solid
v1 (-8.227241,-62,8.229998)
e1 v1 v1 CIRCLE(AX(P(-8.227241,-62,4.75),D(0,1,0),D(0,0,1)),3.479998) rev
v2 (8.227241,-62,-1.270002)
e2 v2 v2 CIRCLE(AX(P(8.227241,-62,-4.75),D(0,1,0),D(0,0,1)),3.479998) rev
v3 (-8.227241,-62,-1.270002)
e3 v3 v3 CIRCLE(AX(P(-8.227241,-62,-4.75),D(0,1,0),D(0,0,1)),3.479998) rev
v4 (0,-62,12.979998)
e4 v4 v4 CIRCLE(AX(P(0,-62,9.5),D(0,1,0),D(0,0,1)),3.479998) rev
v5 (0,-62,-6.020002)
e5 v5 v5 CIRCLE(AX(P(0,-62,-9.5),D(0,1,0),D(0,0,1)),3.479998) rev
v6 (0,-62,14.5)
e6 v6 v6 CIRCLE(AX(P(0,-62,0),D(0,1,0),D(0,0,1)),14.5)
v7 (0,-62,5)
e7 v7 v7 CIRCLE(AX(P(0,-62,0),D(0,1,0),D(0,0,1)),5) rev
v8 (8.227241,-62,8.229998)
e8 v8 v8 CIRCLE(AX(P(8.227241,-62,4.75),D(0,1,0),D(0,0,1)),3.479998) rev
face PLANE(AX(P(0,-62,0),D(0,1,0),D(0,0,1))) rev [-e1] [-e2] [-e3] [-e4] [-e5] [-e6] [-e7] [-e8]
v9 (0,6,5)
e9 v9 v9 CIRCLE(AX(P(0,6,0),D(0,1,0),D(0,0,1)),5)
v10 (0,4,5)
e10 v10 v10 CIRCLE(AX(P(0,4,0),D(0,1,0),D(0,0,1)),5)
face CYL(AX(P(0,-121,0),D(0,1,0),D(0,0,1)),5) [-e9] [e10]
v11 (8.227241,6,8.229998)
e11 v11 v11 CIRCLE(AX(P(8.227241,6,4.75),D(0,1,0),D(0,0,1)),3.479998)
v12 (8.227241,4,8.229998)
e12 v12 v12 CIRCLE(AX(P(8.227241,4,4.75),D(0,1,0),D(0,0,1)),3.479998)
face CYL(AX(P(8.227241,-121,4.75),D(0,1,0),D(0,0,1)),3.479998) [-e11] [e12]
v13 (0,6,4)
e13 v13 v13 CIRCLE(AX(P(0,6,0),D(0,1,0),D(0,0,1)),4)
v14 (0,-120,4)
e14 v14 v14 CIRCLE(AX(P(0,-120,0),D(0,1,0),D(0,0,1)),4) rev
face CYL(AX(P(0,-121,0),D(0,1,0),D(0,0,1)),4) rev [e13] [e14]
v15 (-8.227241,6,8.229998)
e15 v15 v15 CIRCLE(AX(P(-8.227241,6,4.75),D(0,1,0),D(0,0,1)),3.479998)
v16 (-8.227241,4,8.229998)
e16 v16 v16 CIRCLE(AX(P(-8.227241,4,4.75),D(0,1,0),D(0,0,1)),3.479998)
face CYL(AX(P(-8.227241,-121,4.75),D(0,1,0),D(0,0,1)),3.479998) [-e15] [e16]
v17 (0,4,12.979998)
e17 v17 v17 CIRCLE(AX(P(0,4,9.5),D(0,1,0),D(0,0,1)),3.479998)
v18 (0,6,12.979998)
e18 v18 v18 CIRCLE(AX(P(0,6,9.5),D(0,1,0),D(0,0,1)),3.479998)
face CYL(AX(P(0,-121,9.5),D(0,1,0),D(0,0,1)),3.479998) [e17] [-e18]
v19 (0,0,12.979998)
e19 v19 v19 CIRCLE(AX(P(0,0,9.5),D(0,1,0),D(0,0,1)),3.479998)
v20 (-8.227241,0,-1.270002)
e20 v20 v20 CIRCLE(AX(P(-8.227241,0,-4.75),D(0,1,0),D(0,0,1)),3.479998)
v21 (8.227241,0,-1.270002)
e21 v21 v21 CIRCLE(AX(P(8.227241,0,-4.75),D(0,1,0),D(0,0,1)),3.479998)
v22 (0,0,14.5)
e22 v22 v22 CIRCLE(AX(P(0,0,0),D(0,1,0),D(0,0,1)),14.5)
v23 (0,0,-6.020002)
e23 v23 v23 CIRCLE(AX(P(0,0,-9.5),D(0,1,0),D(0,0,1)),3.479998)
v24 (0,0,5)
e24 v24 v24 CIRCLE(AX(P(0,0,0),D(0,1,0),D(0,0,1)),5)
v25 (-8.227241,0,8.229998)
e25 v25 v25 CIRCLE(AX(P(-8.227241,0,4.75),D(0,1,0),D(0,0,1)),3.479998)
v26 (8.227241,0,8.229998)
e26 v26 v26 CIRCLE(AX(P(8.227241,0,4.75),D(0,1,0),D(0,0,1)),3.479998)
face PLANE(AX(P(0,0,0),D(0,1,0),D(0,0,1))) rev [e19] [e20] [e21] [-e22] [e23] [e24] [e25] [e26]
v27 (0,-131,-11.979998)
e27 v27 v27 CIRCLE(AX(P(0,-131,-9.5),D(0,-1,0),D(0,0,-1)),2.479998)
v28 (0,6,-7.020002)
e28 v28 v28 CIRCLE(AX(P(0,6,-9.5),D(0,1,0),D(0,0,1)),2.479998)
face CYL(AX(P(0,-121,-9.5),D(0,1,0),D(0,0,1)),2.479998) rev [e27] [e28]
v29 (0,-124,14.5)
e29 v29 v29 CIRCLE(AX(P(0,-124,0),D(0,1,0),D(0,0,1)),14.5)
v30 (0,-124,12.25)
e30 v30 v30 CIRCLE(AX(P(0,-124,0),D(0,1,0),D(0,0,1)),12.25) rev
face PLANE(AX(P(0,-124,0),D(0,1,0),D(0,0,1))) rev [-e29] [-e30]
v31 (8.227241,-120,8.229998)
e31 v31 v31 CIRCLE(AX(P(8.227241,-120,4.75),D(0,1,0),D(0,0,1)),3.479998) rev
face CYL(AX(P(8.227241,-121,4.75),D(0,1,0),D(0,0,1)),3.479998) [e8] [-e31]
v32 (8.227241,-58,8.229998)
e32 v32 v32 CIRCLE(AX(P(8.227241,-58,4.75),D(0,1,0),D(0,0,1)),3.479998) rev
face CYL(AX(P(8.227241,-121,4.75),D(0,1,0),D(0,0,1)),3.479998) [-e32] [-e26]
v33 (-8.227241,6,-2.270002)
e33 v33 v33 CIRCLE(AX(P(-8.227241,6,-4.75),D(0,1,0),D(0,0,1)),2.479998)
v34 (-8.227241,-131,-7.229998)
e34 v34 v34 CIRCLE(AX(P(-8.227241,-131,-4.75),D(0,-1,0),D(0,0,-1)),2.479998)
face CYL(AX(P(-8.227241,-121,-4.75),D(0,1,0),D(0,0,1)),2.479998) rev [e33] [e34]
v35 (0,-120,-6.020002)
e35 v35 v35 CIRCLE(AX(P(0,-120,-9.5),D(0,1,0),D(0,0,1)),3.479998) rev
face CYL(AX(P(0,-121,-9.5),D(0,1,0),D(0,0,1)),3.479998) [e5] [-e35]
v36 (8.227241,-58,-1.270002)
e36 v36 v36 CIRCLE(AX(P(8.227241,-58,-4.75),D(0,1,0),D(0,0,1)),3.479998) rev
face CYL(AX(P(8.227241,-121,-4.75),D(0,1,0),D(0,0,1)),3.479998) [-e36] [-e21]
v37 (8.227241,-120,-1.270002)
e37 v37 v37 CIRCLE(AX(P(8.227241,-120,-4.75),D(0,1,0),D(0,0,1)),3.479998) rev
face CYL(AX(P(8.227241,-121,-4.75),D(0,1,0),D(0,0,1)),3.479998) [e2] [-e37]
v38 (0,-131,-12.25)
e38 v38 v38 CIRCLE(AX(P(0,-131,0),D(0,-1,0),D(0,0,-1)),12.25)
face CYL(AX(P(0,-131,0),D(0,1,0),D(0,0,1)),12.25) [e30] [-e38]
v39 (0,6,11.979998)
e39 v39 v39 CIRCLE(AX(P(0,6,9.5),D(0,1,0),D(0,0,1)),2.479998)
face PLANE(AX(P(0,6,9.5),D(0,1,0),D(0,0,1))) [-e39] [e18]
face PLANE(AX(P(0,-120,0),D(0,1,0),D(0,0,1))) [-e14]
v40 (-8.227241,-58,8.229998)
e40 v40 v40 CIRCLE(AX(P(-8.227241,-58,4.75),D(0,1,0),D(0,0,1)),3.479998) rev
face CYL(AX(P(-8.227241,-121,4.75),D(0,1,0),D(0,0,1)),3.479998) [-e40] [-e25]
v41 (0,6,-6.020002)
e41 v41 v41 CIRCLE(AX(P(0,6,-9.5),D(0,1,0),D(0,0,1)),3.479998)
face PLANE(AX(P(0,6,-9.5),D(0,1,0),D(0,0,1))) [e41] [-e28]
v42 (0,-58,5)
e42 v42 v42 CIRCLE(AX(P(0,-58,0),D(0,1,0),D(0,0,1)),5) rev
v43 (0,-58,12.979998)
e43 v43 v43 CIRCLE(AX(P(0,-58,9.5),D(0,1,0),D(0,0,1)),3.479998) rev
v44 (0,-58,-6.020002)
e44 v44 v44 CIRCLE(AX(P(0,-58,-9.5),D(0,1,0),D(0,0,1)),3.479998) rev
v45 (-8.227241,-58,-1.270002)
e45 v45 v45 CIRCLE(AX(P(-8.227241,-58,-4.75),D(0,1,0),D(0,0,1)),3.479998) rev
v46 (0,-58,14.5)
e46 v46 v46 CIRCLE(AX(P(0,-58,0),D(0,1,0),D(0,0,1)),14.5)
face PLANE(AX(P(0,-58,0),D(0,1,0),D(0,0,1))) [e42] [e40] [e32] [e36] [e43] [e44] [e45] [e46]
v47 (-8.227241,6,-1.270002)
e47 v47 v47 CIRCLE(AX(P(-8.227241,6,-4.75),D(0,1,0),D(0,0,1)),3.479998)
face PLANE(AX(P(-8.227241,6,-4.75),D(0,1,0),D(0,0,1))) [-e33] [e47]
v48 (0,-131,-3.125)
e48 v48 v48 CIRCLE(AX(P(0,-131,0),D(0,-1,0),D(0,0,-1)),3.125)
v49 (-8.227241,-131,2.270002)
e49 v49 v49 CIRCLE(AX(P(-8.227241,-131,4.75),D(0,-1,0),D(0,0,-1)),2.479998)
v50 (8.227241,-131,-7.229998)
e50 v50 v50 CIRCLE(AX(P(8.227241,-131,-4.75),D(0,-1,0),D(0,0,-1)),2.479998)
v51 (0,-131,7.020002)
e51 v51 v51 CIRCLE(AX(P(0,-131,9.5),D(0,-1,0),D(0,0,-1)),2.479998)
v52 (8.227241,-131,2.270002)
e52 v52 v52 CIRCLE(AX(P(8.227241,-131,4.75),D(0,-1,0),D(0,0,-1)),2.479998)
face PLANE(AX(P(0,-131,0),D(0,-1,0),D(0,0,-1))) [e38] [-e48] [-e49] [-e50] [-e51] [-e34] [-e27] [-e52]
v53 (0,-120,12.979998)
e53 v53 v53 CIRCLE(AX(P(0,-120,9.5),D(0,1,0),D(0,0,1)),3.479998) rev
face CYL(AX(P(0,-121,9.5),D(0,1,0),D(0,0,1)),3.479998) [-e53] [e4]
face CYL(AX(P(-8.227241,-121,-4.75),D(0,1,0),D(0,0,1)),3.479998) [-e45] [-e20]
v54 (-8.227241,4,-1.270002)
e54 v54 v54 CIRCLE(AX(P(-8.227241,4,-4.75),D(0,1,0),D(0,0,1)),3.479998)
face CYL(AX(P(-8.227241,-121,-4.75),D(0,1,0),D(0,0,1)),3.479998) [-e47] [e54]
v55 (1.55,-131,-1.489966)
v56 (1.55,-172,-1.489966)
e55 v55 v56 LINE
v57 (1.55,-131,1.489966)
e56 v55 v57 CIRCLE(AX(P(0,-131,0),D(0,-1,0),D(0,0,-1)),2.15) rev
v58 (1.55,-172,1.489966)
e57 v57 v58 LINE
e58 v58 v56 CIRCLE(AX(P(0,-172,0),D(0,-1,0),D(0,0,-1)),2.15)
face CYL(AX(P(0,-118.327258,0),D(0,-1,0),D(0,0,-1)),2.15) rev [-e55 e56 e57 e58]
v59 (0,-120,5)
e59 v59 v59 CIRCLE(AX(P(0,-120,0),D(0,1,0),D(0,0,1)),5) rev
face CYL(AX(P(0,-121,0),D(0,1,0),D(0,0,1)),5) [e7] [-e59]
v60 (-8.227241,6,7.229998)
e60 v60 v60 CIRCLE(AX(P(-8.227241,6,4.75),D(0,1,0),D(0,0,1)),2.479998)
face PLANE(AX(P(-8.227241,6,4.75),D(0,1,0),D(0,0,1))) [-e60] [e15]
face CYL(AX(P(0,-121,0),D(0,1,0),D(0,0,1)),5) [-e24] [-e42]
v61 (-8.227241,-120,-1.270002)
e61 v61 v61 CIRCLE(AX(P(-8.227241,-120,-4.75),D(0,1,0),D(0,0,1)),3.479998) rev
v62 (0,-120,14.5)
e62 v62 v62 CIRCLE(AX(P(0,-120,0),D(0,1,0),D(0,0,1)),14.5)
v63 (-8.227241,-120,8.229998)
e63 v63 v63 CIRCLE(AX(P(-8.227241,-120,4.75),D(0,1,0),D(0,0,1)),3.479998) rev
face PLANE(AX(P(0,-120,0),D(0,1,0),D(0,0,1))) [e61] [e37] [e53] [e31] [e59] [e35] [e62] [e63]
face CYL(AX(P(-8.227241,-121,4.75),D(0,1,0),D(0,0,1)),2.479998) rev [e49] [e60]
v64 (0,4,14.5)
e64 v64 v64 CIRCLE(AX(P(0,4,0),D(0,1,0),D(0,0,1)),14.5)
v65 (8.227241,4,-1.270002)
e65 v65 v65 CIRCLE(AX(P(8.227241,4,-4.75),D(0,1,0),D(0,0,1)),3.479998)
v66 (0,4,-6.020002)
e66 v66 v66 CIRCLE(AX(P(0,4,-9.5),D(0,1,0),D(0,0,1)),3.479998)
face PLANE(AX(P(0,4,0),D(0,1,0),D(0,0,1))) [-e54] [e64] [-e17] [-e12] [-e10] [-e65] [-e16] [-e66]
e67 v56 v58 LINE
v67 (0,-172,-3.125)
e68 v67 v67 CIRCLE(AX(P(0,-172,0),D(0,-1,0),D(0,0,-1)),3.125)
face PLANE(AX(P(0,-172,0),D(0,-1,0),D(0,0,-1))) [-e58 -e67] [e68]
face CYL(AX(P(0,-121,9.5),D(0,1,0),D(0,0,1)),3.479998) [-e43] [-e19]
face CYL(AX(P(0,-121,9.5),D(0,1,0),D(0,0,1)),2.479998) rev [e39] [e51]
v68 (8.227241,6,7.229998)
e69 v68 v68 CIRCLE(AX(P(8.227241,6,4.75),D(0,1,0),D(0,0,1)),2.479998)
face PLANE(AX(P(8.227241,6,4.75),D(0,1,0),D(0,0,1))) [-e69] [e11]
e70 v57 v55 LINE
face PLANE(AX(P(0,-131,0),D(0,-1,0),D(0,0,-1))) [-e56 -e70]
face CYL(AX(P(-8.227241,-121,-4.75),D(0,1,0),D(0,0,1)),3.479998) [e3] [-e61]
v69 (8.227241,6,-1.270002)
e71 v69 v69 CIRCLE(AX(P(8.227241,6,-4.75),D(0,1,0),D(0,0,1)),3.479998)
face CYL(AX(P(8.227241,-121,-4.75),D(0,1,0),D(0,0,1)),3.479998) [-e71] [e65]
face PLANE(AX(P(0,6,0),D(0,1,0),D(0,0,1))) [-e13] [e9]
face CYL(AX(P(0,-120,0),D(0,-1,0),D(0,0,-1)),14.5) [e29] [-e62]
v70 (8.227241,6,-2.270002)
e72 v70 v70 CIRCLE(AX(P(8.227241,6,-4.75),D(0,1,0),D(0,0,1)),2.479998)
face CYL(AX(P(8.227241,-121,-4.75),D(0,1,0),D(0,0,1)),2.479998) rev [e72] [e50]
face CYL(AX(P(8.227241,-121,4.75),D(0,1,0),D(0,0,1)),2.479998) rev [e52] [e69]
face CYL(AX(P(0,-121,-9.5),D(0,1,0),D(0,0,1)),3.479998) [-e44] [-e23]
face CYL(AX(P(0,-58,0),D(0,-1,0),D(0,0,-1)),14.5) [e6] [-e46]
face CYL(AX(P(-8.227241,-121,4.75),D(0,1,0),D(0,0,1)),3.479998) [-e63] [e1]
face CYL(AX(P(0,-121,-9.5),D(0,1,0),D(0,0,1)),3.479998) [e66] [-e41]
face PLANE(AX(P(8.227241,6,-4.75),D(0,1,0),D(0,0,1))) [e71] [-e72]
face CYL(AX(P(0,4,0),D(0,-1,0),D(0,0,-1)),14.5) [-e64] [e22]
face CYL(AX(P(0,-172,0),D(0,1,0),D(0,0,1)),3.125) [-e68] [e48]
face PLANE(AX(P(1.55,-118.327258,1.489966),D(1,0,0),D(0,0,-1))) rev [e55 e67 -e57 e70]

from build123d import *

# Parameters (mm, degrees)
SKETCH1_R                = 14.5
BOSS_EXTRUDE1_DEPTH      = 4
BOSS_EXTRUDE2_DEPTH      = 2
BOSS_EXTRUDE2_DEPTH_BACK = 125
SKETCH2_R                = 5
SKETCH2_R_2              = 4
SKETCH2_R_3              = 3.479997652
SKETCH2_R_4              = 2.479997652
LPATTERN4_START          = -124
LPATTERN4_OUTLINE_R      = 14.5
LPATTERN4_DEPTH          = 4
LPATTERN4_START_2        = -62
LPATTERN4_2_OUTLINE_R    = 14.5
LPATTERN4_2_OUTLINE_R_2  = 3.479997652
LPATTERN4_2_OUTLINE_R_3  = 5
LPATTERN4_2_OUTLINE_R_4  = 4
LPATTERN4_2_OUTLINE_R_5  = 2.479997652
LPATTERN4_2_DEPTH        = 4
SKETCH8_R                = 2.479997652
CUT_EXTRUDE4_DEPTH       = 128
SKETCH12_R               = 3.125
BOSS_EXTRUDE4_DEPTH      = 48
CUT_EXTRUDE5_DEPTH       = 48
SKETCH14_R               = 4
CUT_EXTRUDE6_DEPTH       = 124
SKETCH16_R               = 12.25
SKETCH16_R_2             = 2.479997652
BOSS_EXTRUDE5_DEPTH      = 7


# Read off the part's stored shape, not the designer's step: LPattern4
with BuildPart() as part:
    # Sketch1 → Boss-Extrude1 (new body)
    with BuildSketch(Plane(origin=(0, 0, 0), x_dir=(1, 0, 0), z_dir=(0, 1, 0))):
        with Locations(Location((0, 0, 0), (0, 0, 270))):
            Circle(SKETCH1_R)
    extrude(amount=BOSS_EXTRUDE1_DEPTH)

    # Sketch2 → Boss-Extrude2 (add, two sides: drawn at the far end of the back side and taken through both)
    # profile 1 of 7: a face of its own
    with BuildSketch(Plane(origin=(0, 4, 0), x_dir=(1, 0, 0), z_dir=(0, 1, 0)).offset(-BOSS_EXTRUDE2_DEPTH_BACK)):
        with Locations(Location((0, 0, 0), (0, 0, 270))):
            Circle(SKETCH2_R)
        with Locations(Location((0, 0, 0), (0, 0, 270))):
            Circle(SKETCH2_R_2, mode=Mode.SUBTRACT)
    # profile 2 of 7: a face of its own
    with BuildSketch(Plane(origin=(0, 4, 0), x_dir=(1, 0, 0), z_dir=(0, 1, 0)).offset(-BOSS_EXTRUDE2_DEPTH_BACK)):
        with Locations(Location((0, 9.5, 0), (0, 0, 270))):
            Circle(SKETCH2_R_3)
        with Locations(Location((0, 9.5, 0), (0, 0, 270))):
            Circle(SKETCH2_R_4, mode=Mode.SUBTRACT)
    # profile 3 of 7: a face of its own
    with BuildSketch(Plane(origin=(0, 4, 0), x_dir=(1, 0, 0), z_dir=(0, 1, 0)).offset(-BOSS_EXTRUDE2_DEPTH_BACK)):
        with Locations(Location((8.227241336, 4.75, 0), (0, 0, 270))):
            Circle(SKETCH2_R_3)
        with Locations(Location((8.227241336, 4.75, 0), (0, 0, 270))):
            Circle(SKETCH2_R_4, mode=Mode.SUBTRACT)
    # profile 4 of 7: a face of its own
    with BuildSketch(Plane(origin=(0, 4, 0), x_dir=(1, 0, 0), z_dir=(0, 1, 0)).offset(-BOSS_EXTRUDE2_DEPTH_BACK)):
        with Locations(Location((8.227241336, -4.75, 0), (0, 0, 270))):
            Circle(SKETCH2_R_3)
        with Locations(Location((8.227241336, -4.75, 0), (0, 0, 270))):
            Circle(SKETCH2_R_4, mode=Mode.SUBTRACT)
    # profile 5 of 7: a face of its own
    with BuildSketch(Plane(origin=(0, 4, 0), x_dir=(1, 0, 0), z_dir=(0, 1, 0)).offset(-BOSS_EXTRUDE2_DEPTH_BACK)):
        with Locations(Location((0, -9.5, 0), (0, 0, 270))):
            Circle(SKETCH2_R_3)
        with Locations(Location((0, -9.5, 0), (0, 0, 270))):
            Circle(SKETCH2_R_4, mode=Mode.SUBTRACT)
    # profile 6 of 7: a face of its own
    with BuildSketch(Plane(origin=(0, 4, 0), x_dir=(1, 0, 0), z_dir=(0, 1, 0)).offset(-BOSS_EXTRUDE2_DEPTH_BACK)):
        with Locations(Location((-8.227241336, -4.75, 0), (0, 0, 270))):
            Circle(SKETCH2_R_3)
        with Locations(Location((-8.227241336, -4.75, 0), (0, 0, 270))):
            Circle(SKETCH2_R_4, mode=Mode.SUBTRACT)
    # profile 7 of 7: a face of its own
    with BuildSketch(Plane(origin=(0, 4, 0), x_dir=(1, 0, 0), z_dir=(0, 1, 0)).offset(-BOSS_EXTRUDE2_DEPTH_BACK)):
        with Locations(Location((-8.227241336, 4.75, 0), (0, 0, 270))):
            Circle(SKETCH2_R_3)
        with Locations(Location((-8.227241336, 4.75, 0), (0, 0, 270))):
            Circle(SKETCH2_R_4, mode=Mode.SUBTRACT)
    extrude(amount=BOSS_EXTRUDE2_DEPTH + BOSS_EXTRUDE2_DEPTH_BACK)

    # LPattern4 outline → LPattern4 (add)
    with BuildSketch(Plane(origin=(0, 0, 0), x_dir=(1, 0, 0), z_dir=(0, 1, 0)).offset(LPATTERN4_START)):
        Circle(LPATTERN4_OUTLINE_R)
    extrude(amount=LPATTERN4_DEPTH)

    # LPattern4 2 outline → LPattern4 2 (add)
    # profile 1 of 8: a face of its own
    with BuildSketch(Plane(origin=(0, 0, 0), x_dir=(1, 0, 0), z_dir=(0, 1, 0)).offset(LPATTERN4_START_2)):
        Circle(LPATTERN4_2_OUTLINE_R)
        with Locations((-8.227241336, -4.75)):
            Circle(LPATTERN4_2_OUTLINE_R_2, mode=Mode.SUBTRACT)
        with Locations((0, -9.5)):
            Circle(LPATTERN4_2_OUTLINE_R_2, mode=Mode.SUBTRACT)
        with Locations((8.227241336, -4.75)):
            Circle(LPATTERN4_2_OUTLINE_R_2, mode=Mode.SUBTRACT)
        with Locations((-8.227241336, 4.75)):
            Circle(LPATTERN4_2_OUTLINE_R_2, mode=Mode.SUBTRACT)
        Circle(LPATTERN4_2_OUTLINE_R_3, mode=Mode.SUBTRACT)
        with Locations((8.227241336, 4.75)):
            Circle(LPATTERN4_2_OUTLINE_R_2, mode=Mode.SUBTRACT)
        with Locations((0, 9.5)):
            Circle(LPATTERN4_2_OUTLINE_R_2, mode=Mode.SUBTRACT)
    # profile 2 of 8: a face of its own
    with BuildSketch(Plane(origin=(0, 0, 0), x_dir=(1, 0, 0), z_dir=(0, 1, 0)).offset(LPATTERN4_START_2)):
        Circle(LPATTERN4_2_OUTLINE_R_4)
    # profile 3 of 8: a face of its own
    with BuildSketch(Plane(origin=(0, 0, 0), x_dir=(1, 0, 0), z_dir=(0, 1, 0)).offset(LPATTERN4_START_2)):
        with Locations((0, 9.5)):
            Circle(LPATTERN4_2_OUTLINE_R_5)
    # profile 4 of 8: a face of its own
    with BuildSketch(Plane(origin=(0, 0, 0), x_dir=(1, 0, 0), z_dir=(0, 1, 0)).offset(LPATTERN4_START_2)):
        with Locations((8.227241336, 4.75)):
            Circle(LPATTERN4_2_OUTLINE_R_5)
    # profile 5 of 8: a face of its own
    with BuildSketch(Plane(origin=(0, 0, 0), x_dir=(1, 0, 0), z_dir=(0, 1, 0)).offset(LPATTERN4_START_2)):
        with Locations((8.227241336, -4.75)):
            Circle(LPATTERN4_2_OUTLINE_R_5)
    # profile 6 of 8: a face of its own
    with BuildSketch(Plane(origin=(0, 0, 0), x_dir=(1, 0, 0), z_dir=(0, 1, 0)).offset(LPATTERN4_START_2)):
        with Locations((0, -9.5)):
            Circle(LPATTERN4_2_OUTLINE_R_5)
    # profile 7 of 8: a face of its own
    with BuildSketch(Plane(origin=(0, 0, 0), x_dir=(1, 0, 0), z_dir=(0, 1, 0)).offset(LPATTERN4_START_2)):
        with Locations((-8.227241336, -4.75)):
            Circle(LPATTERN4_2_OUTLINE_R_5)
    # profile 8 of 8: a face of its own
    with BuildSketch(Plane(origin=(0, 0, 0), x_dir=(1, 0, 0), z_dir=(0, 1, 0)).offset(LPATTERN4_START_2)):
        with Locations((-8.227241336, 4.75)):
            Circle(LPATTERN4_2_OUTLINE_R_5)
    extrude(amount=LPATTERN4_2_DEPTH)

    # Sketch8 → Cut-Extrude4 (cut)
    with BuildSketch(Plane(origin=(0, 4, 0), x_dir=(1, 0, 0), z_dir=(0, 1, 0))):
        with Locations(Location((-8.227241336, -4.75, 0), (0, 0, 270))):
            Circle(SKETCH8_R)
        with Locations(Location((0, -9.5, 0), (0, 0, 270))):
            Circle(SKETCH8_R)
        with Locations(Location((8.227241336, -4.75, 0), (0, 0, 270))):
            Circle(SKETCH8_R)
        with Locations(Location((8.227241336, 4.75, 0), (0, 0, 270))):
            Circle(SKETCH8_R)
        with Locations(Location((0, 9.5, 0), (0, 0, 270))):
            Circle(SKETCH8_R)
        with Locations(Location((-8.227241336, 4.75, 0), (0, 0, 270))):
            Circle(SKETCH8_R)
    extrude(amount=-CUT_EXTRUDE4_DEPTH, mode=Mode.SUBTRACT)

    # Sketch12 → Boss-Extrude4 (add)
    with BuildSketch(Plane.XZ.offset(124)):
        with Locations(Location((0, 0, 0), (0, 0, 90))):
            Circle(SKETCH12_R)
    extrude(amount=BOSS_EXTRUDE4_DEPTH)

    # Sketch9 → Cut-Extrude5 (cut)
    with BuildSketch(Plane.XZ.offset(172)):
        with BuildLine():
            Line((1.55, 1.489966443), (1.55, -1.489966443))
            ThreePointArc((1.55, -1.489966443), (-2.15, 0), (1.55, 1.489966443))
        make_face()
    extrude(amount=-CUT_EXTRUDE5_DEPTH, mode=Mode.SUBTRACT)

    # Sketch14 → Cut-Extrude6 (cut)
    with BuildSketch(Plane(origin=(0, 4, 0), x_dir=(1, 0, 0), z_dir=(0, 1, 0))):
        with Locations(Location((0, 0, 0), (0, 0, 270))):
            Circle(SKETCH14_R)
    extrude(amount=-CUT_EXTRUDE6_DEPTH, mode=Mode.SUBTRACT)

    # Sketch16 → Boss-Extrude5 (add)
    with BuildSketch(Plane.XZ.offset(124)):
        with Locations(Location((0, 0, 0), (0, 0, 90))):
            Circle(SKETCH16_R)
        with Locations(Location((0, 9.5, 0), (0, 0, 90))):
            Circle(SKETCH16_R_2, mode=Mode.SUBTRACT)
        with Locations(Location((8.227241336, 4.75, 0), (0, 0, 90))):
            Circle(SKETCH16_R_2, mode=Mode.SUBTRACT)
        with Locations(Location((8.227241336, -4.75, 0), (0, 0, 90))):
            Circle(SKETCH16_R_2, mode=Mode.SUBTRACT)
        with Locations(Location((0, -9.5, 0), (0, 0, 90))):
            Circle(SKETCH16_R_2, mode=Mode.SUBTRACT)
        with Locations(Location((-8.227241336, -4.75, 0), (0, 0, 90))):
            Circle(SKETCH16_R_2, mode=Mode.SUBTRACT)
        with Locations(Location((-8.227241336, 4.75, 0), (0, 0, 90))):
            Circle(SKETCH16_R_2, mode=Mode.SUBTRACT)
    extrude(amount=BOSS_EXTRUDE5_DEPTH)


solid = part.part
